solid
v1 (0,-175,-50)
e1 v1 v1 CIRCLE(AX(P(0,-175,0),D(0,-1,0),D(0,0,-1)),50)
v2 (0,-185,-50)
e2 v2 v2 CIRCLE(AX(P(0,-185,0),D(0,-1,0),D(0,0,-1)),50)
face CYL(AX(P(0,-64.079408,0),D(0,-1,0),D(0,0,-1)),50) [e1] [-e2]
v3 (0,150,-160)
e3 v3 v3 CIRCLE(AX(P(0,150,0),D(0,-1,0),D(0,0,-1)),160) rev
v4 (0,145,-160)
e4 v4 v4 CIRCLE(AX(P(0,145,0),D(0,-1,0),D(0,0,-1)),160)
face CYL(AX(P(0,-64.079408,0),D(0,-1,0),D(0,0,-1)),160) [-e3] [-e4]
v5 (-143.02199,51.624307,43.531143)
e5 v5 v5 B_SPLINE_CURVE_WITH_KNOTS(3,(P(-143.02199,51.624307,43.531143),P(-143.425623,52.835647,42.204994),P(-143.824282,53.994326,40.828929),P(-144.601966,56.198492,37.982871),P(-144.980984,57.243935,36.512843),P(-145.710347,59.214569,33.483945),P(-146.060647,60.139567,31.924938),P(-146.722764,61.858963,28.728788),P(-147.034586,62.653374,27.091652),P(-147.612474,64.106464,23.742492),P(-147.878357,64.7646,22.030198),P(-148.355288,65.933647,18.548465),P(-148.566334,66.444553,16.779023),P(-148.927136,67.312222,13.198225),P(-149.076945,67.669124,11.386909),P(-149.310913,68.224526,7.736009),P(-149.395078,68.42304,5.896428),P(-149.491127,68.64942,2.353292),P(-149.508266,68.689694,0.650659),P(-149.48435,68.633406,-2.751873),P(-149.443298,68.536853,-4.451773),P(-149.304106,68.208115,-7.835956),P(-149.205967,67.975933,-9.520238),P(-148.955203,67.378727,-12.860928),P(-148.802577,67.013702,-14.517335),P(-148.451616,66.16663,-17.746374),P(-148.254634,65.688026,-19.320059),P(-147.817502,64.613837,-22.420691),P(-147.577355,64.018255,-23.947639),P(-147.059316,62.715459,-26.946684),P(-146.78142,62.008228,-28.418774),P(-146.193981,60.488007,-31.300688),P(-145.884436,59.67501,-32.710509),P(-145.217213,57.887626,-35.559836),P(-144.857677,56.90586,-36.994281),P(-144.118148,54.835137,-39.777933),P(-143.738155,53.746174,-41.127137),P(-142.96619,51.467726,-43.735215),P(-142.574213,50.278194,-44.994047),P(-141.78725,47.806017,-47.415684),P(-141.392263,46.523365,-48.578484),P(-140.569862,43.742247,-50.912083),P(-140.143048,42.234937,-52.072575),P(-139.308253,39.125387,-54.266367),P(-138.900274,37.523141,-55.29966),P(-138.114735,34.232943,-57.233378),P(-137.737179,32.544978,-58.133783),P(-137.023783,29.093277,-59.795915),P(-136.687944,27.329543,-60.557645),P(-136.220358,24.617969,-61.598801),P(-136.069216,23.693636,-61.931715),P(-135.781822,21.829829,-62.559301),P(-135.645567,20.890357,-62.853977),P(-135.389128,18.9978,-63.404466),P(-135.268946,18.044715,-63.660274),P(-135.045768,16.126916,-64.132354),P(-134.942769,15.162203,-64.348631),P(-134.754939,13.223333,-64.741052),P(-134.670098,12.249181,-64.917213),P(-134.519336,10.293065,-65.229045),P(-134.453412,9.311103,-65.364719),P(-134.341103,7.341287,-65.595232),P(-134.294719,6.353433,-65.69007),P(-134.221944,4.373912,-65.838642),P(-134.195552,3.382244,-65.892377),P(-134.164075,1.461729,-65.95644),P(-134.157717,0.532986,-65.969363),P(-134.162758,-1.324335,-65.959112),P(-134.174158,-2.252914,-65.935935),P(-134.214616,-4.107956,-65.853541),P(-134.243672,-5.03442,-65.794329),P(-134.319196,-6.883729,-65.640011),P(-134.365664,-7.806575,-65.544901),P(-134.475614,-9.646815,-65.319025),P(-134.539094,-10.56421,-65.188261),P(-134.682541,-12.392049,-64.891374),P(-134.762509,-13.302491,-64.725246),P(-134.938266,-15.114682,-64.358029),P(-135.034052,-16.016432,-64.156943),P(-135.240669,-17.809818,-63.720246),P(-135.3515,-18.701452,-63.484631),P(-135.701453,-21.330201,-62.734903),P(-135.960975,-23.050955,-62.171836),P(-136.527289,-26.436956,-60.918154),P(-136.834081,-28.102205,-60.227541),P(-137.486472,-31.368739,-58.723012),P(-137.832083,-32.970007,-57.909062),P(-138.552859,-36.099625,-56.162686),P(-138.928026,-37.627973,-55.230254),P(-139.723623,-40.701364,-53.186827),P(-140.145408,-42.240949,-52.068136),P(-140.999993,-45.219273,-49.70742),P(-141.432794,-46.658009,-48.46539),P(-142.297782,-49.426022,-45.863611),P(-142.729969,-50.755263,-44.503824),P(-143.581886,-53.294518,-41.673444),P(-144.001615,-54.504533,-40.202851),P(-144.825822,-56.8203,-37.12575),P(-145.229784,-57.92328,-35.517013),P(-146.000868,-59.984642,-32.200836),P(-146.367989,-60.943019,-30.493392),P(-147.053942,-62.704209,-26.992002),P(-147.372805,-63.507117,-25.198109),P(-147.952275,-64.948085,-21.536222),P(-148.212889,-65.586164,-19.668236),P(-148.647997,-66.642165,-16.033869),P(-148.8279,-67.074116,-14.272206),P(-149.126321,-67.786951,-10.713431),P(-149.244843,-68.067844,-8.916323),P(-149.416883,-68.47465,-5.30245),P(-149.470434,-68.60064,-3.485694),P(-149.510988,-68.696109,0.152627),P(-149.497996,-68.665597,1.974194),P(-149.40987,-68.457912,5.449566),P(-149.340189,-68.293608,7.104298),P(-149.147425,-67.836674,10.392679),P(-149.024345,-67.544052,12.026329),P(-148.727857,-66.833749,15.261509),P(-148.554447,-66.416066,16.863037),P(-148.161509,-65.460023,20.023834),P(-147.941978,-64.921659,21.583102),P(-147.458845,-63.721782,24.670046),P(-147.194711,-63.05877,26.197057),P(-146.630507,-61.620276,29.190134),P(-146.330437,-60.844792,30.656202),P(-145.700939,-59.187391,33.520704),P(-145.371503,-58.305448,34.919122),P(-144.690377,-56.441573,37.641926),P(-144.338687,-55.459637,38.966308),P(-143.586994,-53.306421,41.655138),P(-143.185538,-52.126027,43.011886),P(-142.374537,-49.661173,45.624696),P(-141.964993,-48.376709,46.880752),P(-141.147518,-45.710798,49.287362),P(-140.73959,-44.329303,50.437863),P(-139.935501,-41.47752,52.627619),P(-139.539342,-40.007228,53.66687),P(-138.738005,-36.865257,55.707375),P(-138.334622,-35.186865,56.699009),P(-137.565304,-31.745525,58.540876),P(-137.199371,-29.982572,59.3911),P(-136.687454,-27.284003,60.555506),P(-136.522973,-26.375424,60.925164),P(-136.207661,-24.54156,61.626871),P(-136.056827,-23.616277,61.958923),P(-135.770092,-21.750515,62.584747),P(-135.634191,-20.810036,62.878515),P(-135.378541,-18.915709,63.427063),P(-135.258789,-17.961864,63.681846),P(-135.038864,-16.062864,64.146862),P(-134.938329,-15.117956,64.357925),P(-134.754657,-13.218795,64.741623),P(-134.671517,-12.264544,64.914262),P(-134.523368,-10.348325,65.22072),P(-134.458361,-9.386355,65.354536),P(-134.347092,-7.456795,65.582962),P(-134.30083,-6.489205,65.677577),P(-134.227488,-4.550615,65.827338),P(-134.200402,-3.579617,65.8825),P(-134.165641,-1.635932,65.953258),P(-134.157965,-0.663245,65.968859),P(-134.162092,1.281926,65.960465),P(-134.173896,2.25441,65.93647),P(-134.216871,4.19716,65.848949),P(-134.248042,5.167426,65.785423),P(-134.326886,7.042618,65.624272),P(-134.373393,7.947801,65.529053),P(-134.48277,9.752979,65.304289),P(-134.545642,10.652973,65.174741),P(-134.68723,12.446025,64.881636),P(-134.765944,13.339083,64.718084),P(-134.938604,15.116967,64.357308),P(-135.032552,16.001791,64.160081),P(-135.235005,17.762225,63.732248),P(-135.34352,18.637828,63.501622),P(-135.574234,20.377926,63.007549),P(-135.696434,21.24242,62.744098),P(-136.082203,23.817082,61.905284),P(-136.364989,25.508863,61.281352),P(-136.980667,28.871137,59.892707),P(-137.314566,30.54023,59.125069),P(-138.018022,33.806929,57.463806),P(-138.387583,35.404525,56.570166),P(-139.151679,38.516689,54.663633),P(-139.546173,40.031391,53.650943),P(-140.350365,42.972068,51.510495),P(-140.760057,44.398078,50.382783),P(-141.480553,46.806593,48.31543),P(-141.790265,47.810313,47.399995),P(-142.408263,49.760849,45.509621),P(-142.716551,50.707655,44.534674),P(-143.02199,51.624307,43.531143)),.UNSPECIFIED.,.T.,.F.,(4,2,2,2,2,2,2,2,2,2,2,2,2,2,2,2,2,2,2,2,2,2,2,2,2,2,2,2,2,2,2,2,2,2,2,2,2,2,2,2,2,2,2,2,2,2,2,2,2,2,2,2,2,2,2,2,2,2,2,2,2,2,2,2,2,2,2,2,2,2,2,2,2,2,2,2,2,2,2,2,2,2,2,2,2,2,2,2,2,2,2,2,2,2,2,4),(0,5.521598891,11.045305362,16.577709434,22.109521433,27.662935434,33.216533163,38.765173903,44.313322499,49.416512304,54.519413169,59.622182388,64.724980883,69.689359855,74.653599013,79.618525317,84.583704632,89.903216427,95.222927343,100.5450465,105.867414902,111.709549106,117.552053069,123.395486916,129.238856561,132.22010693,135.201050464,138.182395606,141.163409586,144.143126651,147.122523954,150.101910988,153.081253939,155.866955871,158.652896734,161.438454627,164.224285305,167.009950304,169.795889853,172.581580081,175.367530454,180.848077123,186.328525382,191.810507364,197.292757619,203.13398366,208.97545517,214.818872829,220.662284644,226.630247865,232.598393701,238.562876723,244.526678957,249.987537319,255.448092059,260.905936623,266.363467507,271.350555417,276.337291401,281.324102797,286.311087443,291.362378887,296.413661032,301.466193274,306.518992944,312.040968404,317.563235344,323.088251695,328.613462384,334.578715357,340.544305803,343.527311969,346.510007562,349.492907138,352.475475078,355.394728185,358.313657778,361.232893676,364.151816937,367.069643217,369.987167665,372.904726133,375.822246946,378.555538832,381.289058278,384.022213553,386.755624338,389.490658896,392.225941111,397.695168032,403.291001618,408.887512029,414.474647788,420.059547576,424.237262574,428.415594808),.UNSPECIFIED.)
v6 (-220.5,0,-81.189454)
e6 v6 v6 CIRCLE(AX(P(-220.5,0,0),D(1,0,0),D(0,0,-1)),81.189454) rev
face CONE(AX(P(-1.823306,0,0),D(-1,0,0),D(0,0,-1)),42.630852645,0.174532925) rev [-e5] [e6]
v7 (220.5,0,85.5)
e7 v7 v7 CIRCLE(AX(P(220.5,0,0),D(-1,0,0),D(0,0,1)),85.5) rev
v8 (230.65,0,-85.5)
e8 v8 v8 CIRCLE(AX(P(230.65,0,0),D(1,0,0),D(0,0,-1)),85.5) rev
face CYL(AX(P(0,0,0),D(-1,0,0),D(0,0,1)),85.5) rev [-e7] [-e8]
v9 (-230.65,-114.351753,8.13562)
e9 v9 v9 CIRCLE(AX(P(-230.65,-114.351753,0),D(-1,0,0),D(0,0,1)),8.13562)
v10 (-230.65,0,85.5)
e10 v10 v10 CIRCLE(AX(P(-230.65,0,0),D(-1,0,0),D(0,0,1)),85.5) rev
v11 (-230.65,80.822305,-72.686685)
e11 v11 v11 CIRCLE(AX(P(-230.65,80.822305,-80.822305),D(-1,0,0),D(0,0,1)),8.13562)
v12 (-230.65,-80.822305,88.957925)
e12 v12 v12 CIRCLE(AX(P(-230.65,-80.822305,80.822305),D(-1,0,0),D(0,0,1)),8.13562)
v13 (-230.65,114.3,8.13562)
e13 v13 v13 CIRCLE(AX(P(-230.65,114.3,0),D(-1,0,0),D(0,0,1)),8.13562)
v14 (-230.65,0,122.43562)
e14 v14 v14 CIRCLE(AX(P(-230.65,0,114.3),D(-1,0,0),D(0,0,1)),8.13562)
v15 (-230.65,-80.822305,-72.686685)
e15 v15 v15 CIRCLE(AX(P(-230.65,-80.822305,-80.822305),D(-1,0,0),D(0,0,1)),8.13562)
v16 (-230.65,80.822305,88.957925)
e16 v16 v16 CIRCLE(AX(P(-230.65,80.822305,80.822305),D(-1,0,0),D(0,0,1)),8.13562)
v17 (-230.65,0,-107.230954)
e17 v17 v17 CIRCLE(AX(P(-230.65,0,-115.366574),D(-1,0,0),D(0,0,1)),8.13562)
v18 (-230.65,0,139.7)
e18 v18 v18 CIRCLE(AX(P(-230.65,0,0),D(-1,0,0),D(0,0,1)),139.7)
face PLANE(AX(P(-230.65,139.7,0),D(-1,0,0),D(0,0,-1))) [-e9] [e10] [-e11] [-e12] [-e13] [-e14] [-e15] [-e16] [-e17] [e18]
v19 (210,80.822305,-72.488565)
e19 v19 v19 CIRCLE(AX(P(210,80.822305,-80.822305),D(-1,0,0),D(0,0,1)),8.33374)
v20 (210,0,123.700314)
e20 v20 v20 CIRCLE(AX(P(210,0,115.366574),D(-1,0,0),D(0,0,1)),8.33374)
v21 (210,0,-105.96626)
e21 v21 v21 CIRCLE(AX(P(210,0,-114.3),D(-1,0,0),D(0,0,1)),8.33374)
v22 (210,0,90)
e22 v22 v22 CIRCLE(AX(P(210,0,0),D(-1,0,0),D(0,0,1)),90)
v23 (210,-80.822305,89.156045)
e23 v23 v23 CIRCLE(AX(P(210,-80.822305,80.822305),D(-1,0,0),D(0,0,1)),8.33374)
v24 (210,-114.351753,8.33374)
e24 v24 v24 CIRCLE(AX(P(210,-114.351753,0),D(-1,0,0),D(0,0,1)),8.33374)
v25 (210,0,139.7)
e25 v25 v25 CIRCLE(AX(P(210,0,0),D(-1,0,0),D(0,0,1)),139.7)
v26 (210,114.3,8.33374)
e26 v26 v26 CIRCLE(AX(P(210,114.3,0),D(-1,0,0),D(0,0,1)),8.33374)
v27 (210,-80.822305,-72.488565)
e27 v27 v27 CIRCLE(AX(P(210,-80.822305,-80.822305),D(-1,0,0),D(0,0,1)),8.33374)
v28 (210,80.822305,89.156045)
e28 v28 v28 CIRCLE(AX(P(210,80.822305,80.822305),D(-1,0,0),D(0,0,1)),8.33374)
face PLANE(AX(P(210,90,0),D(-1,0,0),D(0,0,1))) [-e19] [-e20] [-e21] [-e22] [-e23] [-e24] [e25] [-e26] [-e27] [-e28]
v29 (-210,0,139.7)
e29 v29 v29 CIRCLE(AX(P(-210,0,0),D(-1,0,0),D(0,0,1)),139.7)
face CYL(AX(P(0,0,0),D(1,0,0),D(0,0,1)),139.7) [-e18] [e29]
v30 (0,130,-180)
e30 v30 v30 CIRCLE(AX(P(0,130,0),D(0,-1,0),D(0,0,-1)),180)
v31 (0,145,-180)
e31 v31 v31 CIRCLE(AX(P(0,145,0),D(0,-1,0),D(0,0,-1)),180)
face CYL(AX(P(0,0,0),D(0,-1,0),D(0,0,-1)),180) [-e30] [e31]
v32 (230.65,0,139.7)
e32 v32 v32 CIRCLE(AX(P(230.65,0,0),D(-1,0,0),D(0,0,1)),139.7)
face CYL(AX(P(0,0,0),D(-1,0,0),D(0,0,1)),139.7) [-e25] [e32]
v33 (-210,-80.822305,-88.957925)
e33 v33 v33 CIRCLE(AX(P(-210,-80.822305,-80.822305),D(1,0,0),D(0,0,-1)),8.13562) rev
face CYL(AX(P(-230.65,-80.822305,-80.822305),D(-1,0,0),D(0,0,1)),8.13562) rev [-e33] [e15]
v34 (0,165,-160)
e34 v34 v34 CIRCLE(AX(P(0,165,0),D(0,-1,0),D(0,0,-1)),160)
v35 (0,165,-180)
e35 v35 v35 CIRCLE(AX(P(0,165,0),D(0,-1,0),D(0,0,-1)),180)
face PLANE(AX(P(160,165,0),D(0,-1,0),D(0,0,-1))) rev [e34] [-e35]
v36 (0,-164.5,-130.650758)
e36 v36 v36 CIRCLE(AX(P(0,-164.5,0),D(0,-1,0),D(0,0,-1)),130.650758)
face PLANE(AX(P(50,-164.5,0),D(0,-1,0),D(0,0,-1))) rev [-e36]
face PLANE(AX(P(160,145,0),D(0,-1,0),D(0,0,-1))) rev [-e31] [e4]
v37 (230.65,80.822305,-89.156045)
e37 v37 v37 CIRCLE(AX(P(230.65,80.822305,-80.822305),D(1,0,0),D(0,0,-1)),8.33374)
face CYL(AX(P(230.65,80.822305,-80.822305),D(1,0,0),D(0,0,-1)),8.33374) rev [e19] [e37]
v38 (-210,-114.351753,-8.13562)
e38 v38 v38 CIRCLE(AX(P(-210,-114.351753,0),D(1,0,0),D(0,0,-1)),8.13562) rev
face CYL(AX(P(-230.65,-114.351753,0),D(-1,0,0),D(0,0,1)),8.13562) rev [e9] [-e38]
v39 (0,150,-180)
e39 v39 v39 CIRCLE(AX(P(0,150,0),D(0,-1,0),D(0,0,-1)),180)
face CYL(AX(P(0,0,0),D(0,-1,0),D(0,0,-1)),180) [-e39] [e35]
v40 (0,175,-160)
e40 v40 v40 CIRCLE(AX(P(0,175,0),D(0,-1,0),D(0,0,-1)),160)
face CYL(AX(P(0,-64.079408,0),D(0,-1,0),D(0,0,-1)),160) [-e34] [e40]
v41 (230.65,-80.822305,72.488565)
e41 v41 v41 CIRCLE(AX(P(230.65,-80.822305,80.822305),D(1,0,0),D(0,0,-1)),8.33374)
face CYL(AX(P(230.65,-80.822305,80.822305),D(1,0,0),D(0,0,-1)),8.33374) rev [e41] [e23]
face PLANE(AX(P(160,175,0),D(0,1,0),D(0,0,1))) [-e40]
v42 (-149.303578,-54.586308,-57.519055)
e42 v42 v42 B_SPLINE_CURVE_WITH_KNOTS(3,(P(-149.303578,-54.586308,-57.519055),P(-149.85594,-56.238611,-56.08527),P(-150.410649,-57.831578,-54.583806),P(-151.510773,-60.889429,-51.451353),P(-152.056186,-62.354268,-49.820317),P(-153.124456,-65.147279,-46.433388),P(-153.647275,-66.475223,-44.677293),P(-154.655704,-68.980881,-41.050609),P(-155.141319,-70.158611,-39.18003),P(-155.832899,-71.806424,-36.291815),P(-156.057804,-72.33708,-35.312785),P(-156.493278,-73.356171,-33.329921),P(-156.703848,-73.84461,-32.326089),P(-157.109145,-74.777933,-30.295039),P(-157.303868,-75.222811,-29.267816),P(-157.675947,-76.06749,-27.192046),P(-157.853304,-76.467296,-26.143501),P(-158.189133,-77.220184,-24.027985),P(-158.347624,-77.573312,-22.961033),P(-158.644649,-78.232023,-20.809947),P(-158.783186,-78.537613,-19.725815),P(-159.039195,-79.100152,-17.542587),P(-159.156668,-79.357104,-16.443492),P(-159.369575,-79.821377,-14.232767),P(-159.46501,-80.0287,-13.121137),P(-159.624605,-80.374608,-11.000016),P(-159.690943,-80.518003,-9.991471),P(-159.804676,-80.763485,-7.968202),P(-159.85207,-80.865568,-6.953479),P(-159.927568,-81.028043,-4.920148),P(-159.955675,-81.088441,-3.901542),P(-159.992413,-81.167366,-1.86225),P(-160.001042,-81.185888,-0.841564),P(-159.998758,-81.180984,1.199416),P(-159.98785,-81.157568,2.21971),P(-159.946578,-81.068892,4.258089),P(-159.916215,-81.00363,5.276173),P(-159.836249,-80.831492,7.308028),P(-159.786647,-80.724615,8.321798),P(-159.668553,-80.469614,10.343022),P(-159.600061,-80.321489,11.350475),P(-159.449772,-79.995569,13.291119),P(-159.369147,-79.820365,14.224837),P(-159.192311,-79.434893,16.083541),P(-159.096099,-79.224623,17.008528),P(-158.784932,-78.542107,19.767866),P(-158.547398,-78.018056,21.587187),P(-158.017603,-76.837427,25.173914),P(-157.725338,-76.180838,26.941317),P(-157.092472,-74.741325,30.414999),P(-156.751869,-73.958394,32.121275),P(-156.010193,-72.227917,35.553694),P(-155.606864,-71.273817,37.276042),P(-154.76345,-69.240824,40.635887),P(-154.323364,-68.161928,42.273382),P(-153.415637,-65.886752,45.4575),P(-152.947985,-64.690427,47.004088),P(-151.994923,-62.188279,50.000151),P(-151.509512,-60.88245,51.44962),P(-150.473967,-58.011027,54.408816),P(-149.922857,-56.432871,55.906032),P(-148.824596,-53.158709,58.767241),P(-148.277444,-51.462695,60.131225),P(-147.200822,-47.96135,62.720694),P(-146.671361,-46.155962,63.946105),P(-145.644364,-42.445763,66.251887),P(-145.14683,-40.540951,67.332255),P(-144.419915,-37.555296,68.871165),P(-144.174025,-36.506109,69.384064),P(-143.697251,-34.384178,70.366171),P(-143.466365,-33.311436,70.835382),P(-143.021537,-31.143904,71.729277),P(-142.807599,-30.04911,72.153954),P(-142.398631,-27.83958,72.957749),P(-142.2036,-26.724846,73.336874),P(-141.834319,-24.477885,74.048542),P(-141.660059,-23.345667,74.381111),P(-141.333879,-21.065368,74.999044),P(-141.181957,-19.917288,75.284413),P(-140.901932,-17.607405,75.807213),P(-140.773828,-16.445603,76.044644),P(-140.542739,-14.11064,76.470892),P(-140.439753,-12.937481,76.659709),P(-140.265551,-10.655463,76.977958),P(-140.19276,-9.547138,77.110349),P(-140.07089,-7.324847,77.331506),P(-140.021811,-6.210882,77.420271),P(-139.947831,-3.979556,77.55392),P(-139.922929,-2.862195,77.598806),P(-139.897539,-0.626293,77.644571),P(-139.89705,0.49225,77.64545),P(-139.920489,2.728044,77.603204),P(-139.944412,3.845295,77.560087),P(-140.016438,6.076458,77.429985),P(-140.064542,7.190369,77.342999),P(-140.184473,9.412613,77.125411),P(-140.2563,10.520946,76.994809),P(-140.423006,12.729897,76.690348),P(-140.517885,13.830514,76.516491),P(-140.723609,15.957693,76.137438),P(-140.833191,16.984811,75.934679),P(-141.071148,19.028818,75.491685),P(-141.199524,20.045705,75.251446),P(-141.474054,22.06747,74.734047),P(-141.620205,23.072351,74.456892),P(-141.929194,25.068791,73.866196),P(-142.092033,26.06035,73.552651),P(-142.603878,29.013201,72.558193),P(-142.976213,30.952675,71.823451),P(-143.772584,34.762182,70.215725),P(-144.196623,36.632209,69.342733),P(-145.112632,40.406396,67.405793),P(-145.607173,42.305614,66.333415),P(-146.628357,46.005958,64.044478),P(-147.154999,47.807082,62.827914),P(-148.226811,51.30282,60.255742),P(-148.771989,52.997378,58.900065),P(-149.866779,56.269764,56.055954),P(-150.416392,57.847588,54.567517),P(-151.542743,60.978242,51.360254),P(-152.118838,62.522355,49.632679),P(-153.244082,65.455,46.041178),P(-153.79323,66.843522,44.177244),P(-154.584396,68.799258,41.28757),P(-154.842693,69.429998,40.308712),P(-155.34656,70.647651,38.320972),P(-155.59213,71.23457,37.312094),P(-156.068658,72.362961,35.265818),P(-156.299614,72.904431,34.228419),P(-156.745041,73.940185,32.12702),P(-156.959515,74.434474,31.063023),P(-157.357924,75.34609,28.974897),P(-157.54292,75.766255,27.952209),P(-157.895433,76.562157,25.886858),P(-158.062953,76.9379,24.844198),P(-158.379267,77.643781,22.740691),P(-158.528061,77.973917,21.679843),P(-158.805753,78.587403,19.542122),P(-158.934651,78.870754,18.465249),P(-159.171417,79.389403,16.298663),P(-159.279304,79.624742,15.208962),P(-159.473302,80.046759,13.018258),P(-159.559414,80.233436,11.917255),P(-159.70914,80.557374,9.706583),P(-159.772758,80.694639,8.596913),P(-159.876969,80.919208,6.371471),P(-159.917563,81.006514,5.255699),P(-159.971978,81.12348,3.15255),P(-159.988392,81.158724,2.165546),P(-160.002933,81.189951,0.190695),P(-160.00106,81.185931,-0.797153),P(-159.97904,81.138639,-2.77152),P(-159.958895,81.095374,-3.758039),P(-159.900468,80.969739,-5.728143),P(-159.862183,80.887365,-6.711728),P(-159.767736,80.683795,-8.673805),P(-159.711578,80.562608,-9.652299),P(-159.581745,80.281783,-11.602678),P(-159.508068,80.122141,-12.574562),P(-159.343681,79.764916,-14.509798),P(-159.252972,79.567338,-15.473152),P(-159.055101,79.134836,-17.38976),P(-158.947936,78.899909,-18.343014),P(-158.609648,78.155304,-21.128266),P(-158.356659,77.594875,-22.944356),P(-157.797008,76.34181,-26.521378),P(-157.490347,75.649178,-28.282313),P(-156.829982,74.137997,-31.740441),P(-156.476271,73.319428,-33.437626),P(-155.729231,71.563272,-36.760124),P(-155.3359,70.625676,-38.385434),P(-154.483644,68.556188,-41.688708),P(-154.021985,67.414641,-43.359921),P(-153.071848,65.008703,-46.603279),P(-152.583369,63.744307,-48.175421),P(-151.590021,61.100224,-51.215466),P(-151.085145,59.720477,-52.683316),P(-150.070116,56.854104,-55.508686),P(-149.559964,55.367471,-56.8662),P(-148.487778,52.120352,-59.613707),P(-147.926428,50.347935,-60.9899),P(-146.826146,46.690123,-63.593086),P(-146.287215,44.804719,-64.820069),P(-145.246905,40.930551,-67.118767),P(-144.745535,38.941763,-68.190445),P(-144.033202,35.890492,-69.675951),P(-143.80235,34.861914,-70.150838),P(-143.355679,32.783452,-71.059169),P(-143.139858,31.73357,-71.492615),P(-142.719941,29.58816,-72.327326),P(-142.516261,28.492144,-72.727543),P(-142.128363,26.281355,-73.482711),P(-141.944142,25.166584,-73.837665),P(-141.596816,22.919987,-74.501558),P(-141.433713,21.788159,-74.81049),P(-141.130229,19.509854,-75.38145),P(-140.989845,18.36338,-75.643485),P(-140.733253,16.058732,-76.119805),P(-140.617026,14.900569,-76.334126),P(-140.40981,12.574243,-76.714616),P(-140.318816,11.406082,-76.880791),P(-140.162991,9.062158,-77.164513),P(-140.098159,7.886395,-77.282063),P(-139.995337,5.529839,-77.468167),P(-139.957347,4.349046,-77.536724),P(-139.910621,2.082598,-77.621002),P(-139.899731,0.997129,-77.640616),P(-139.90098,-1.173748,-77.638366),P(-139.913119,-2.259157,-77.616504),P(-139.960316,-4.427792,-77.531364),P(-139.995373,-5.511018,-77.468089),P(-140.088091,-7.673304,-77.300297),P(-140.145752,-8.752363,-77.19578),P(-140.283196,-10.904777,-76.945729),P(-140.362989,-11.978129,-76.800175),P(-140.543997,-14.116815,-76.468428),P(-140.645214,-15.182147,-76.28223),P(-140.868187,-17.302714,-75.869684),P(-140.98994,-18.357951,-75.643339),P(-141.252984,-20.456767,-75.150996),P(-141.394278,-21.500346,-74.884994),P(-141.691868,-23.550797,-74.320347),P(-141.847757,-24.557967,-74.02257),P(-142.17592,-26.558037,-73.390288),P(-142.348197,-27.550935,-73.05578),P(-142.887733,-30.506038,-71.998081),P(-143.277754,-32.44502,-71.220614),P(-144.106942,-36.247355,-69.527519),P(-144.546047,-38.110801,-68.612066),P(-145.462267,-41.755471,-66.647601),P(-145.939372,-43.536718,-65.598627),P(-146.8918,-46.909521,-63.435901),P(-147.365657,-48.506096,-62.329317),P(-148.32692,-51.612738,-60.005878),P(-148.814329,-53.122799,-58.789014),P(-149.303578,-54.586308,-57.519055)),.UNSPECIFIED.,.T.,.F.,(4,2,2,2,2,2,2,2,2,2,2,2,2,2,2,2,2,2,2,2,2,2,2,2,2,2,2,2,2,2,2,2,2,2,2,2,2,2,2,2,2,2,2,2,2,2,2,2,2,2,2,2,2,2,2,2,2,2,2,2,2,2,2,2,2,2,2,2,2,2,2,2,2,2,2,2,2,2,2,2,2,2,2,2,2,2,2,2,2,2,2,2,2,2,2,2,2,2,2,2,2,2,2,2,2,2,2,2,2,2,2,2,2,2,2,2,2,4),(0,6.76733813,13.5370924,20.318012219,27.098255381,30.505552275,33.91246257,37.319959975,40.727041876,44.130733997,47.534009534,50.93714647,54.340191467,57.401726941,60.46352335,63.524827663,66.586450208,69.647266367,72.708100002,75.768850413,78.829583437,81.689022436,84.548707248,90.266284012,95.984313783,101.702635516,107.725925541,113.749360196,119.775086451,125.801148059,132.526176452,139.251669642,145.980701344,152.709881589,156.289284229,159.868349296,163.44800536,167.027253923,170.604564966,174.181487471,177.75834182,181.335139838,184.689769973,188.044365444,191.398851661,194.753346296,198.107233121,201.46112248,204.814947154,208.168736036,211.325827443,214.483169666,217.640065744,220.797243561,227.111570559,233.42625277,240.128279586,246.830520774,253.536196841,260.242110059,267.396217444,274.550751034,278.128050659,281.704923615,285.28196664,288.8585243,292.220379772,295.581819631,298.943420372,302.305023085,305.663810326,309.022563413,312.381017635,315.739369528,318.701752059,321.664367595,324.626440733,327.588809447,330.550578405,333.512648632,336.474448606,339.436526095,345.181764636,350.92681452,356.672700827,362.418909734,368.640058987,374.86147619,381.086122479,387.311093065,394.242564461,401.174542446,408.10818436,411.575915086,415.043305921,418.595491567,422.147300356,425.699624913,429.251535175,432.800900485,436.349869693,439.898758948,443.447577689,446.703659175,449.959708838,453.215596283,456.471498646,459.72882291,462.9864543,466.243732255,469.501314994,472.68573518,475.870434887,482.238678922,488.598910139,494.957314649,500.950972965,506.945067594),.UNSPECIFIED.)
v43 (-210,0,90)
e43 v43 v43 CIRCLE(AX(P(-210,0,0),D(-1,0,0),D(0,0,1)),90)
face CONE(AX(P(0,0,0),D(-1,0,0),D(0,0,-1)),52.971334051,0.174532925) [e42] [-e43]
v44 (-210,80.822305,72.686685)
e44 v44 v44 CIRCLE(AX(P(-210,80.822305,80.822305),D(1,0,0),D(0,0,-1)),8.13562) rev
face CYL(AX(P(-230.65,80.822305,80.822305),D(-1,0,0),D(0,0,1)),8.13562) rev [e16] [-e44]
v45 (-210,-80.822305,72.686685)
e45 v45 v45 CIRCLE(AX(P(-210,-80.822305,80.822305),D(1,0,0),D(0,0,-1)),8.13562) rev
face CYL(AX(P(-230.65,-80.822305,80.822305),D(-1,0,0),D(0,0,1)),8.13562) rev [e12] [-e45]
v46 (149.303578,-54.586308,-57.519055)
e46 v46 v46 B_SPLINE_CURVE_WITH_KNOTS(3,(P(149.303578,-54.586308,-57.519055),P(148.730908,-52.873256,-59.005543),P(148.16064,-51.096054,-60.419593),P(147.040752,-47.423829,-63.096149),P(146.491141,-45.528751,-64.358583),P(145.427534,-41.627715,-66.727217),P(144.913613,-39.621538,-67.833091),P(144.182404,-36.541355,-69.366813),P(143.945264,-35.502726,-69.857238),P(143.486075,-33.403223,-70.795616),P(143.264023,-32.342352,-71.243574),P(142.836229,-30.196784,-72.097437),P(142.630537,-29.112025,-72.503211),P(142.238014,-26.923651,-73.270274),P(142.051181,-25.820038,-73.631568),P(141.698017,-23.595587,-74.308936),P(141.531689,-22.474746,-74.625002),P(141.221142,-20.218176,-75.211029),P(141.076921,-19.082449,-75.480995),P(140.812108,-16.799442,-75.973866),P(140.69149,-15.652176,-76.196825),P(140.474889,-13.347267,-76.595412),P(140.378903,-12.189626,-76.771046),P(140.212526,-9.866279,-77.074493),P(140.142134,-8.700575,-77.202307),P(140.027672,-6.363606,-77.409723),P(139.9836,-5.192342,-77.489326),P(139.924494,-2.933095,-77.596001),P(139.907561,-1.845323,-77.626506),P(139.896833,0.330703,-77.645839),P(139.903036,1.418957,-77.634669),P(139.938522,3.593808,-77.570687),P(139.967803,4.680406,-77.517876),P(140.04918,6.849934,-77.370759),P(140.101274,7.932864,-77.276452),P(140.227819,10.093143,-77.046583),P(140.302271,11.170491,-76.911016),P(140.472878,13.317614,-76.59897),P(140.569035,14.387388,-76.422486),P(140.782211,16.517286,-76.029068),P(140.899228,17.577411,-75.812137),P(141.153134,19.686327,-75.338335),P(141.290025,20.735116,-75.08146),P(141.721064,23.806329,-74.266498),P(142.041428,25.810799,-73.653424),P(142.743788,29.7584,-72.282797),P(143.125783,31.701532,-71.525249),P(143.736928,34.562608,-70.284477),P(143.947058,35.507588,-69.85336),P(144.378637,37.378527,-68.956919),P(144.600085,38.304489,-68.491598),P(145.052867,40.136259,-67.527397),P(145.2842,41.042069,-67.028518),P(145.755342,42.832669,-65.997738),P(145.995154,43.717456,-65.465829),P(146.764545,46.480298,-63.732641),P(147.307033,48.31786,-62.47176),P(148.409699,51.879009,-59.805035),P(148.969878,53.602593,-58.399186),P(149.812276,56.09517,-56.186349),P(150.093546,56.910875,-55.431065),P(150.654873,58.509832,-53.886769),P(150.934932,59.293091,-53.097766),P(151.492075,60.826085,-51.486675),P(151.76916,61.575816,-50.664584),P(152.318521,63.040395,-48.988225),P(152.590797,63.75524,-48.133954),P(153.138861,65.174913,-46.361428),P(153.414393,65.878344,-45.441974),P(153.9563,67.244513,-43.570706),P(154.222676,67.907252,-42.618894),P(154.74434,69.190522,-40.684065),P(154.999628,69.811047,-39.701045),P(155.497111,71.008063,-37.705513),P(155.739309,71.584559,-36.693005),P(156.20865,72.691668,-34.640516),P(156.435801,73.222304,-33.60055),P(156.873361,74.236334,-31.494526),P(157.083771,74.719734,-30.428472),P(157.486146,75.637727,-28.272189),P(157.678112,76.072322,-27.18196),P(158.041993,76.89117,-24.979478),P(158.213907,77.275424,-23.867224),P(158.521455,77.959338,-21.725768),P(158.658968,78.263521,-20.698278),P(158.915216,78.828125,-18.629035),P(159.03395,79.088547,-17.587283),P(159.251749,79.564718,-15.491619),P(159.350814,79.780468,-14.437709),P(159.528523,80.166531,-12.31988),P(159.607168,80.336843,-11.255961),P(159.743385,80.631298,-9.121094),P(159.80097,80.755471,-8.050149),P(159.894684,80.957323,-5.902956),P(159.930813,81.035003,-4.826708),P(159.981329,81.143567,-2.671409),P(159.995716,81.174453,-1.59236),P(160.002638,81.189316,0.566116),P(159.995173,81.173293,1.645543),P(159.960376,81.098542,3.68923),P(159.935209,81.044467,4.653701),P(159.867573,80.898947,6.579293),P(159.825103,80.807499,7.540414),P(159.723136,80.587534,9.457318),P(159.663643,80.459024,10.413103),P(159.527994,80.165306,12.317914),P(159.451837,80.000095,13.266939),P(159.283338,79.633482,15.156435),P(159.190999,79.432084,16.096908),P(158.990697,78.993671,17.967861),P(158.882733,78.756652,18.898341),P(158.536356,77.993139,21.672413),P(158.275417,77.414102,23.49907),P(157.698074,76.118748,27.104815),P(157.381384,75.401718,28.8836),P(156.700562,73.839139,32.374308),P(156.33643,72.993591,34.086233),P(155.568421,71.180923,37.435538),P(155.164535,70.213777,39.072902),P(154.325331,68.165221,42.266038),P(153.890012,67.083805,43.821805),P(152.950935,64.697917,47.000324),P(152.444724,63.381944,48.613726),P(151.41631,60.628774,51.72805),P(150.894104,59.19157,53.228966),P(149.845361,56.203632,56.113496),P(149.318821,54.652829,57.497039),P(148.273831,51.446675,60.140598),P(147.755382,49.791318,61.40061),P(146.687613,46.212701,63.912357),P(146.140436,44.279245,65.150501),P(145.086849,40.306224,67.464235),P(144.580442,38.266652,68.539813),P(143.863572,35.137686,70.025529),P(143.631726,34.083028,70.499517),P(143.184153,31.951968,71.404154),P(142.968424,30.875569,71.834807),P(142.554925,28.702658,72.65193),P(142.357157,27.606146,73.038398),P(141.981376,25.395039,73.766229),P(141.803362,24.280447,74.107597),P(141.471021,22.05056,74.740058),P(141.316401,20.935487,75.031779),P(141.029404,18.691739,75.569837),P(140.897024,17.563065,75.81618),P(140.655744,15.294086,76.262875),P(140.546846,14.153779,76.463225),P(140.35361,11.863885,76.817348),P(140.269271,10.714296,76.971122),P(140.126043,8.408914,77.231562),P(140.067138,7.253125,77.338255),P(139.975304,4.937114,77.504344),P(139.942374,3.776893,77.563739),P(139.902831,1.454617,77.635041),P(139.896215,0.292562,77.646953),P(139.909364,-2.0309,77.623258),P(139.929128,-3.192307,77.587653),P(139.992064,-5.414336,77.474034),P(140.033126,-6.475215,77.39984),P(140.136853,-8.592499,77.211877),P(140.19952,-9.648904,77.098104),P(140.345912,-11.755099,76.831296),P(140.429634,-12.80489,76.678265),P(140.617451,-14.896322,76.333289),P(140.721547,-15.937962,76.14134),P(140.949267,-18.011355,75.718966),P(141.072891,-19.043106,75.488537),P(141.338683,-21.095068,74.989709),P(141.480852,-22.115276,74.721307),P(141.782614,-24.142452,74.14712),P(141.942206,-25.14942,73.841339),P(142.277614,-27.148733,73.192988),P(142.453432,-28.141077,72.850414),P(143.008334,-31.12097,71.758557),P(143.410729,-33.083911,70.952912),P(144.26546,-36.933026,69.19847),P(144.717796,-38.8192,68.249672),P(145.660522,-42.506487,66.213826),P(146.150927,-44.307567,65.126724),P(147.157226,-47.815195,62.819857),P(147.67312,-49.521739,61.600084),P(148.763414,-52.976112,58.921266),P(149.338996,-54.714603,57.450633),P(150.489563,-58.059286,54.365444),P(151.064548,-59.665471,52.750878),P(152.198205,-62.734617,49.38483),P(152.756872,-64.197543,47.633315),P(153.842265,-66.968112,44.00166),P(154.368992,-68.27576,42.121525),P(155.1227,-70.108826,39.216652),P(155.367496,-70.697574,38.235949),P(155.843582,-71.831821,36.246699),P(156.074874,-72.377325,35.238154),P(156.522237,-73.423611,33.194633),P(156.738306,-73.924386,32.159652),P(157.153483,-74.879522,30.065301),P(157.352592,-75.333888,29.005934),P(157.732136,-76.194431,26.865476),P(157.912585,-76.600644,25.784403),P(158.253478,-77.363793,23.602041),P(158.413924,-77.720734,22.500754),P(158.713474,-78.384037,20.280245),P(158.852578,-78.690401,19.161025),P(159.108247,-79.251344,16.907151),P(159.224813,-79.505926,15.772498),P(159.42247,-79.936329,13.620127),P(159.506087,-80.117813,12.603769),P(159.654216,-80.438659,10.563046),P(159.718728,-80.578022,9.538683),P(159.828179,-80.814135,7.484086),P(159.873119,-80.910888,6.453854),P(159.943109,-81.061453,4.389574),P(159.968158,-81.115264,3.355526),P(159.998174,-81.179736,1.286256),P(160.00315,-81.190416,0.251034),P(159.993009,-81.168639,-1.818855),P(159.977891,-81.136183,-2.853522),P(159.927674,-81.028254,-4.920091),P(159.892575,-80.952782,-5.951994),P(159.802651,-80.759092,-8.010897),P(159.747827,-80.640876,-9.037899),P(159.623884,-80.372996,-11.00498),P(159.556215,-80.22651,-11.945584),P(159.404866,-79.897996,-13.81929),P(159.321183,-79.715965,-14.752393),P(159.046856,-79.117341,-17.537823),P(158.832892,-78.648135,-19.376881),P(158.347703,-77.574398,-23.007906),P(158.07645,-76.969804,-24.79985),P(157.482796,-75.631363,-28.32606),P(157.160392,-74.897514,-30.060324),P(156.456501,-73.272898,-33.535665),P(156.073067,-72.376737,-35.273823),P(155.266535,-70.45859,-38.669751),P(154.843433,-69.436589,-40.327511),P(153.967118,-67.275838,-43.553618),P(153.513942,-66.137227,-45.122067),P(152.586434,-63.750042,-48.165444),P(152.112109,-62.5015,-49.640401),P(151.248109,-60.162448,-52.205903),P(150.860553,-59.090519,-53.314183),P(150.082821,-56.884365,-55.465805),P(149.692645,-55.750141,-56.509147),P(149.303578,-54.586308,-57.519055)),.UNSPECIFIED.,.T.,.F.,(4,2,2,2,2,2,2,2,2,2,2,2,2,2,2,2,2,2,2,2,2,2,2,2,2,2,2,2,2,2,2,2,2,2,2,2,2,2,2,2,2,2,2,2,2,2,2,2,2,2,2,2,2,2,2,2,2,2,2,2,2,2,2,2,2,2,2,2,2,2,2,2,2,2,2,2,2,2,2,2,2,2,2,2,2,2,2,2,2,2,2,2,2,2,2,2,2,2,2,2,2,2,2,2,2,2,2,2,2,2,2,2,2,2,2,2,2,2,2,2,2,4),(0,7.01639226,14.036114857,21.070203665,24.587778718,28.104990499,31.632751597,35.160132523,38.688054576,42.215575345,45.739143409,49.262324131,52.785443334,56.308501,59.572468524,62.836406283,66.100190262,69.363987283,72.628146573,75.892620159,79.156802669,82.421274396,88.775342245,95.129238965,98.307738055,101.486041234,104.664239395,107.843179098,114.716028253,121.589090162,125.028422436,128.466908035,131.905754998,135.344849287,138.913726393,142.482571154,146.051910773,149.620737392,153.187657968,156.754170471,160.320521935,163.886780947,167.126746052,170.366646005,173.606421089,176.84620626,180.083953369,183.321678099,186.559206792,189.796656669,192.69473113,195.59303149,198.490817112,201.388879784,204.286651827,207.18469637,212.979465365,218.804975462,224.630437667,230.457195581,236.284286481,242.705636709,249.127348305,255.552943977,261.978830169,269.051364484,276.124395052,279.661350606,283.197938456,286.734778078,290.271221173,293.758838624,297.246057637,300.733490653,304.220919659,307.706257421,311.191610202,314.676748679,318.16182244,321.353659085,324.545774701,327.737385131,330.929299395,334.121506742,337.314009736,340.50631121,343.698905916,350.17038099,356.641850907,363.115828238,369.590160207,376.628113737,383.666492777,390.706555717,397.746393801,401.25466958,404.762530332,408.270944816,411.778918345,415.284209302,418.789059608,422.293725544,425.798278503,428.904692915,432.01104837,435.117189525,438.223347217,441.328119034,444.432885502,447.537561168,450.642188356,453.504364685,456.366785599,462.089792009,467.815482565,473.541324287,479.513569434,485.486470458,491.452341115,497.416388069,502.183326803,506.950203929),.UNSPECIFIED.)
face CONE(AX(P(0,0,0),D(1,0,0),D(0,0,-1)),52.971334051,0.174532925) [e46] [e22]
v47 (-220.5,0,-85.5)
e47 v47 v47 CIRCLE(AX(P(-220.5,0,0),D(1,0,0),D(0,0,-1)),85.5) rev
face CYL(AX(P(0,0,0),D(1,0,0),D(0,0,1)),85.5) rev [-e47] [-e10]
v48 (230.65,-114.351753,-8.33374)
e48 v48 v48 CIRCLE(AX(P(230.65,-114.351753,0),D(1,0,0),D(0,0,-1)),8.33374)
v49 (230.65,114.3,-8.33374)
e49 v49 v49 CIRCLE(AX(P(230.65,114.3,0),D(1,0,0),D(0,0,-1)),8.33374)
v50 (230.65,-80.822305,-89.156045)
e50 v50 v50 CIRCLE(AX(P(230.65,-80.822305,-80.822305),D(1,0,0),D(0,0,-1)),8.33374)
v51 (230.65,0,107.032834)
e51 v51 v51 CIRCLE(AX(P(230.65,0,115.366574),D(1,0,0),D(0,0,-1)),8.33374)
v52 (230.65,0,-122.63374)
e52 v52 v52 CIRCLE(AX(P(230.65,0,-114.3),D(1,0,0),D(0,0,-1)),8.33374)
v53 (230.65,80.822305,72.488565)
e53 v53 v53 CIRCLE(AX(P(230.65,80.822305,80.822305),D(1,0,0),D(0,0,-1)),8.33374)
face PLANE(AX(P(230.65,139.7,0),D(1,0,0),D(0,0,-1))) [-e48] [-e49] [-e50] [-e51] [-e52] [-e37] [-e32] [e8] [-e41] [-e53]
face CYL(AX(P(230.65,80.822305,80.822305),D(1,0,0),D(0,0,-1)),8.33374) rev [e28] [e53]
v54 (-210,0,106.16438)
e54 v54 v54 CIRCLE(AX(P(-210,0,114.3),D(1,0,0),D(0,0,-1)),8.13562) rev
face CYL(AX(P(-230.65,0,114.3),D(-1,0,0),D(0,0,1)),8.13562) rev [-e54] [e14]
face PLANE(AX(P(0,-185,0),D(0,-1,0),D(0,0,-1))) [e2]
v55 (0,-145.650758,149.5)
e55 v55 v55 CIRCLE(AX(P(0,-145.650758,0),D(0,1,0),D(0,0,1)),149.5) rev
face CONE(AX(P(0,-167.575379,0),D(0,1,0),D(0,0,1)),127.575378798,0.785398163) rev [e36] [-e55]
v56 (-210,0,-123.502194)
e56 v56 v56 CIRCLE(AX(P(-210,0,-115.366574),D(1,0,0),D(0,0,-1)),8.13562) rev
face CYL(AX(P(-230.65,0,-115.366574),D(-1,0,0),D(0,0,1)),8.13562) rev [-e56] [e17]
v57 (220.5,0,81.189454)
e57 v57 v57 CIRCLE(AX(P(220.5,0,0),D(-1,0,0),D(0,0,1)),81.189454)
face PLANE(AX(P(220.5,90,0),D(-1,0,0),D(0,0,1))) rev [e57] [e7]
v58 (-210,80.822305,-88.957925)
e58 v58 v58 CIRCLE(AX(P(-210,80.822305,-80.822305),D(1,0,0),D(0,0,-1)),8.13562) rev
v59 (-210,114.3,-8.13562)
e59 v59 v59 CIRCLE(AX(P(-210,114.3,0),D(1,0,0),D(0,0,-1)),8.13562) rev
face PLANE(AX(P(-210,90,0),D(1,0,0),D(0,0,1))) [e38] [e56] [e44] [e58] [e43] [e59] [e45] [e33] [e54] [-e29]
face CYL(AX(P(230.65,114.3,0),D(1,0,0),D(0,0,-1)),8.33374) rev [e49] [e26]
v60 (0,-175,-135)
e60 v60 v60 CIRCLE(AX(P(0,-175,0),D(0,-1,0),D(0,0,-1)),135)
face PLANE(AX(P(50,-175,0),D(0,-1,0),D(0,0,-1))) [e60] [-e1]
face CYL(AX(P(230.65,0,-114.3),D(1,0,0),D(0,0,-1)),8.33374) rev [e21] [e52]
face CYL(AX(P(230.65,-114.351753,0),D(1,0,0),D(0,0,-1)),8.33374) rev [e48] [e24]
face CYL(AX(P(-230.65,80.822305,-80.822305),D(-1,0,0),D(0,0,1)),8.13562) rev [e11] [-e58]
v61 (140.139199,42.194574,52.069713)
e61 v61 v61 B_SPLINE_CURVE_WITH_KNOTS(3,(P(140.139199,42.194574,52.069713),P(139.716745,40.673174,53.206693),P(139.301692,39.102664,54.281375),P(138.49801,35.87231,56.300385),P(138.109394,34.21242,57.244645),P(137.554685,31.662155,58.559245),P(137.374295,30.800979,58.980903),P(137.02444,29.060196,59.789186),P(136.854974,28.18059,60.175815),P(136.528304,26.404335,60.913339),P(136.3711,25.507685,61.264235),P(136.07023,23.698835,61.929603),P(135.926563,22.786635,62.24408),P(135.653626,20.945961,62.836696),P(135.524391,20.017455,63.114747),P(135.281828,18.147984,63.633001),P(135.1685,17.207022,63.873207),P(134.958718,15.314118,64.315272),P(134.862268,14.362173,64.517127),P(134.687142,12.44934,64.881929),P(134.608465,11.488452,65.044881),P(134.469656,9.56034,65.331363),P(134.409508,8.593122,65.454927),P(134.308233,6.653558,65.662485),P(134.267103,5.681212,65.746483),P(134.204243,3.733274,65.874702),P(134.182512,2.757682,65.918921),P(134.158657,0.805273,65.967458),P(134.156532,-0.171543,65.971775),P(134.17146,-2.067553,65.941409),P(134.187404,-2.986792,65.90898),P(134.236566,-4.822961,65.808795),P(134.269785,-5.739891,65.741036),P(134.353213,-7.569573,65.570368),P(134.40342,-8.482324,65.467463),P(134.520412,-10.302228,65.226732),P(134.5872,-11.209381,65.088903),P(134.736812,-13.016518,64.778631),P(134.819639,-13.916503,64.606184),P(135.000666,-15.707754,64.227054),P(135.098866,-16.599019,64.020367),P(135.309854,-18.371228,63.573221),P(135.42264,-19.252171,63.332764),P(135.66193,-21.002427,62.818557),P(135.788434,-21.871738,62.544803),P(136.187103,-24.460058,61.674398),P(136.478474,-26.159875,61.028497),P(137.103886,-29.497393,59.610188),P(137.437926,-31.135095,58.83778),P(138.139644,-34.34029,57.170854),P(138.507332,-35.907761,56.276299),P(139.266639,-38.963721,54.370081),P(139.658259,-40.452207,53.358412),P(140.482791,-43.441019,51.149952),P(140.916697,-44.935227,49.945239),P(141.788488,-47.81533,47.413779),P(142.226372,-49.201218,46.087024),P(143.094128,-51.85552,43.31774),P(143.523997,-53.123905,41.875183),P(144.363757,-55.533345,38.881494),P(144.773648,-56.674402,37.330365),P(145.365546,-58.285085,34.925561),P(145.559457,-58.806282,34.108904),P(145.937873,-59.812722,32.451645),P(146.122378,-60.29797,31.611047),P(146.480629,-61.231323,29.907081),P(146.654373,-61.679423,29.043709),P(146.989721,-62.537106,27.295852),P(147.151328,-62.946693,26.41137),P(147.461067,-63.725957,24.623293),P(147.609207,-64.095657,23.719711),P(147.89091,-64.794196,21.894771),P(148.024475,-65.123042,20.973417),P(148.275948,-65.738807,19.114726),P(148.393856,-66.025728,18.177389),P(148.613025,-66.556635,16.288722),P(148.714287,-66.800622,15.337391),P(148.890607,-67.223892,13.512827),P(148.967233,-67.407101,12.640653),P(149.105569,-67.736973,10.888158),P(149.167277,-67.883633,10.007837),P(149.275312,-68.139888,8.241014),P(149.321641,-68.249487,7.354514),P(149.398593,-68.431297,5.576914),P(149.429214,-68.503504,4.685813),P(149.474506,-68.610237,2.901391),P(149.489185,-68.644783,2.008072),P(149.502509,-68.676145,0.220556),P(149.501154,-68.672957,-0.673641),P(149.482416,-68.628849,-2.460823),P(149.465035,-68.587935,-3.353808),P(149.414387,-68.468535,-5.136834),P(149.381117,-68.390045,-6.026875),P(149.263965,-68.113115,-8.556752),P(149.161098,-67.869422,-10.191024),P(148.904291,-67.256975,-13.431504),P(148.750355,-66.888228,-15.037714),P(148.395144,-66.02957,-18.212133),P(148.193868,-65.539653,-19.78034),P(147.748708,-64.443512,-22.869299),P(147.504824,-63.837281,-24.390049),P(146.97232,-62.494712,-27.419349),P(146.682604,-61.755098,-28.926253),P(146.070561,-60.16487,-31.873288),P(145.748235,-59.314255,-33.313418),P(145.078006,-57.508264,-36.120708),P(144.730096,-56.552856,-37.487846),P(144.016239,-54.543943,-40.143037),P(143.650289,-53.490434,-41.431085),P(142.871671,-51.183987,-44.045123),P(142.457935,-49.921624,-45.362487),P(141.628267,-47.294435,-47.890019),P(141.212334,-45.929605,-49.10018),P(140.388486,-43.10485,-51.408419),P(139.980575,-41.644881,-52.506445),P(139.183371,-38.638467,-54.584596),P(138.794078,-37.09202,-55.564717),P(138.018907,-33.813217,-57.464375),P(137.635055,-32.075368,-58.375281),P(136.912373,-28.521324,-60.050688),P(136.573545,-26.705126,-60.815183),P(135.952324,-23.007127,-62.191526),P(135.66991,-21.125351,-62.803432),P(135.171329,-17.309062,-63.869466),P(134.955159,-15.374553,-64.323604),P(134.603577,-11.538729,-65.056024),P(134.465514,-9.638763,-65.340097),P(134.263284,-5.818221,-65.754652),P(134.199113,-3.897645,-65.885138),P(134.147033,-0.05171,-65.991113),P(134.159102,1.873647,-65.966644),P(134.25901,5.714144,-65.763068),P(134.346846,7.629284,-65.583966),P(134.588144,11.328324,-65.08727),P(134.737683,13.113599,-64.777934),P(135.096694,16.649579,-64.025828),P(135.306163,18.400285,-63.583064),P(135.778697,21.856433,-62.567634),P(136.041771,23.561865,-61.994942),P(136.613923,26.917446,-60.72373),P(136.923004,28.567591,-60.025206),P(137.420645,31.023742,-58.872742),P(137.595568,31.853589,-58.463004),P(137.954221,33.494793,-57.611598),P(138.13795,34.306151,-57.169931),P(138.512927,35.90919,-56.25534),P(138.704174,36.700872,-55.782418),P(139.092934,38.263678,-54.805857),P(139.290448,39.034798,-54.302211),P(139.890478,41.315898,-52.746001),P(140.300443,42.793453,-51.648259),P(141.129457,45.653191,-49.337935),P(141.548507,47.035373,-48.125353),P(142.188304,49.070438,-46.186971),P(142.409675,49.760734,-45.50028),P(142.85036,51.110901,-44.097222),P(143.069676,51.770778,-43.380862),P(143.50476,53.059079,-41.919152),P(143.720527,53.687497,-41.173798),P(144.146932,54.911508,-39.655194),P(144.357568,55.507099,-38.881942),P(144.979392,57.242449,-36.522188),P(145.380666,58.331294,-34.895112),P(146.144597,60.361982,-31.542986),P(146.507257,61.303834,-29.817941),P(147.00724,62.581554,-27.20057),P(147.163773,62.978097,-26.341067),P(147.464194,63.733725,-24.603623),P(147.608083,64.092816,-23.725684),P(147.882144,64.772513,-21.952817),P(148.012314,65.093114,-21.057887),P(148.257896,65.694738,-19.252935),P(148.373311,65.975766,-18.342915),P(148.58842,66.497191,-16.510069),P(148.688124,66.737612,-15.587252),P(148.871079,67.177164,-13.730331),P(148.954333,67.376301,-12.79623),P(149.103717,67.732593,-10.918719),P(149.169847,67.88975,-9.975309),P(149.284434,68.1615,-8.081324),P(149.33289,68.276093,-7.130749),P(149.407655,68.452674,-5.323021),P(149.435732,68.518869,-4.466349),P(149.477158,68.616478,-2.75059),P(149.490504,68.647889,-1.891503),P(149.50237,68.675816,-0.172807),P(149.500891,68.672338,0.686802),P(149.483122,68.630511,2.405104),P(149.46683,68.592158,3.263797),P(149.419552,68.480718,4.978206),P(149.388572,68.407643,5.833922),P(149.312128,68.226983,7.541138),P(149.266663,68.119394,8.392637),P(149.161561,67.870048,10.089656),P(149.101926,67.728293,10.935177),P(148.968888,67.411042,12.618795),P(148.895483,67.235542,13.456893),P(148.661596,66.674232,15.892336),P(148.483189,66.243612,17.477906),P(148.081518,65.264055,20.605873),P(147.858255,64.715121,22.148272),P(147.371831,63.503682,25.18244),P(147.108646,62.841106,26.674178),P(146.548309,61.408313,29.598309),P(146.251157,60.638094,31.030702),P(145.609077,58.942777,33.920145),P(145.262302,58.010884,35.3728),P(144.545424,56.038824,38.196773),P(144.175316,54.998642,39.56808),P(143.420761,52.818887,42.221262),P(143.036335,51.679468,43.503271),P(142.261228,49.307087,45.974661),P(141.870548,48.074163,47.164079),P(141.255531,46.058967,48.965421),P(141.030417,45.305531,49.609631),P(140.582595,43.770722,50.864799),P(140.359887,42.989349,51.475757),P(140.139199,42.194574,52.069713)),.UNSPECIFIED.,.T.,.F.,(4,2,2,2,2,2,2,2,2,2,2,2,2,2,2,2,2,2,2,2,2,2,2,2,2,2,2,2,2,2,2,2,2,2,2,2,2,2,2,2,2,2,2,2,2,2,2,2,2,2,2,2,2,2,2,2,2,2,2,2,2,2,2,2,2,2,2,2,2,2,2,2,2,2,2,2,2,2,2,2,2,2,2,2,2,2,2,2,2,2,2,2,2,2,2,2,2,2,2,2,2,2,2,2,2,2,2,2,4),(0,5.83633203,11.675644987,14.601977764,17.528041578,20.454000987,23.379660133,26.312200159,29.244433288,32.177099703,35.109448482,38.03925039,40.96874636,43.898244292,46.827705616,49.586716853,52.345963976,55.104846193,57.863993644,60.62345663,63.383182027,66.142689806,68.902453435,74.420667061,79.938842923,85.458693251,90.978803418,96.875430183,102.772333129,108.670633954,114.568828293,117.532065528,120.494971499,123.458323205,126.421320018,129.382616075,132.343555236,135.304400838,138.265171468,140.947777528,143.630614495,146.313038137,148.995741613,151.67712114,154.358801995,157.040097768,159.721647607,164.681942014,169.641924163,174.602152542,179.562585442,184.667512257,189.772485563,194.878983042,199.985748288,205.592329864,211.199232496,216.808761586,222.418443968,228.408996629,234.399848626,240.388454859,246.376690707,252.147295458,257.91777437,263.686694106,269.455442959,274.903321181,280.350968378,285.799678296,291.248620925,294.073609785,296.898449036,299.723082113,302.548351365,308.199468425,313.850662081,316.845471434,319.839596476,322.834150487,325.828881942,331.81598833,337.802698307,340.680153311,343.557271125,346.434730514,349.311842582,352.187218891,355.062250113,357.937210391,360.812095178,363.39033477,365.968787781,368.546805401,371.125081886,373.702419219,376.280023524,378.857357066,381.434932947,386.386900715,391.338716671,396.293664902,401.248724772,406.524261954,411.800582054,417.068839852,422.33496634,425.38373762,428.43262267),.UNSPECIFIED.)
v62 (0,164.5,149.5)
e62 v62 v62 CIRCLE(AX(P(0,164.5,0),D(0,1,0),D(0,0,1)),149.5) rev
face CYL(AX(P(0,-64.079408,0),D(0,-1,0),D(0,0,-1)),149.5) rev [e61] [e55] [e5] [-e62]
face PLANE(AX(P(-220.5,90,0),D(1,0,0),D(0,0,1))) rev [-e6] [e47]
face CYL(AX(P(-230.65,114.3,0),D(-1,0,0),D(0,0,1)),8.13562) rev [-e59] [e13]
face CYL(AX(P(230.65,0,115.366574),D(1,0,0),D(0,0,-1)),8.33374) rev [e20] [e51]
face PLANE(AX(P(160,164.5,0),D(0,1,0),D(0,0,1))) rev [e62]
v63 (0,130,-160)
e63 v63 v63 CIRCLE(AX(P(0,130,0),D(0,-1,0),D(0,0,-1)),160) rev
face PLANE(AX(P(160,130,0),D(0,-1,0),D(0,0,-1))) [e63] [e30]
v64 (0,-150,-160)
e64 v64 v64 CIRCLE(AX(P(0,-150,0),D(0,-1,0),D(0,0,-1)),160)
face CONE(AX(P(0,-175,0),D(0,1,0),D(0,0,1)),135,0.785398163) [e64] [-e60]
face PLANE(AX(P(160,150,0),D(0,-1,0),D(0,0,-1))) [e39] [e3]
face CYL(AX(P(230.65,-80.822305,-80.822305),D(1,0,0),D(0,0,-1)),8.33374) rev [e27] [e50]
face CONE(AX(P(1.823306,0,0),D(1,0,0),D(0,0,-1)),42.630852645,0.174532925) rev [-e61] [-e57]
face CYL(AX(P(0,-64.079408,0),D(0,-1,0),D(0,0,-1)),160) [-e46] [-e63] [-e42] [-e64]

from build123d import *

# Parameters (mm, degrees)
SKETCH2_W                   = 20
SKETCH2_H                   = 15
SHELL1_START                = -39.5000001
SHELL1_OUTLINE_R            = 85.5
SHELL1_DEPTH                = 79.0000001
SHELL1_START_2              = -235.4
SHELL1_2_OUTLINE_R          = 85.5
SHELL1_2_DEPTH              = 14.9
SHELL1_START_3              = 220.5
SHELL1_3_OUTLINE_R          = 85.5
SHELL1_3_DEPTH              = 14.9
SHELL1_START_4              = -145.650757695
SHELL1_4_OUTLINE_R          = 149.5
SHELL1_4_DEPTH              = 310.150757695
SHELL1_START_5              = -174.5
SHELL1_5_OUTLINE_R          = 39.5
SHELL1_5_DEPTH              = 89
SKETCH15_R                  = 96
CUT_EXTRUDE4_DEPTH          = 4.75
SKETCH14_R                  = 39.5
EXTRUDE2_DEPTH              = 10
F_5_8_CLEARANCE_HOLE5_D     = 16.27124
F_5_8_CLEARANCE_HOLE5_DEPTH = 20.65
F_5_8_CLEARANCE_HOLE6_D     = 16.66748
F_5_8_CLEARANCE_HOLE6_DEPTH = 20.65
SKETCH30_R                  = 96
CUT_EXTRUDE5_DEPTH          = 529.604474064


with BuildPart() as part:
    # Sketch1 → Base-Revolve (revolve)
    with BuildSketch(Plane.XY, mode=Mode.PRIVATE) as base_revolve_sk:
        Polygon((0, -185), (50, -185), (50, -175), (135, -175), (160, -150), (160, 175), (0, 175), align=None)
    revolve(base_revolve_sk.sketch.rotate(Axis((0, -64.079408138, 0), (0, 1, 0)), 90), axis=Axis((0, -64.079408138, 0), (0, 1, 0)))

    # Sketch2 → Boss-Revolve1 (revolve)
    with BuildSketch(Plane.XY, mode=Mode.PRIVATE) as boss_revolve1_sk:
        with Locations((170, 157.5)):
            Rectangle(SKETCH2_W, SKETCH2_H)
        with Locations((170, 137.5)):
            Rectangle(SKETCH2_W, SKETCH2_H)
    revolve(boss_revolve1_sk.sketch.rotate(Axis((0, 0, 0), (0, 1, 0)), 90), axis=Axis((0, 0, 0), (0, 1, 0)))

    # Sketch3 → Boss-Revolve2 (revolve)
    with BuildSketch(Plane.XY, mode=Mode.PRIVATE) as boss_revolve2_sk:
        Polygon((0, 0), (0, 52.971334051), (210, 90), (210, 139.7), (230.65, 139.7), (230.65, 96), (235.4, 96), (235.4, 0), align=None)
    boss_revolve2 = revolve(boss_revolve2_sk.sketch.rotate(Axis((0, 0, 0), (1, 0, 0)), 90), axis=Axis((0, 0, 0), (1, 0, 0)))

    # Mirror1: Boss-Revolve2 across plane
    add(boss_revolve2.mirror(Plane(origin=(0, 0, 0), x_dir=(0, 0, 1), z_dir=(1, 0, 0))))

    # Shell1: read off the stored shape, not the designer's step
    # Shell1 outline → Shell1 (cut)
    with BuildSketch(Plane.YZ.offset(SHELL1_START)):
        Circle(SHELL1_OUTLINE_R)
    extrude(amount=SHELL1_DEPTH, mode=Mode.SUBTRACT)

    # Shell1 2 outline → Shell1 2 (cut)
    with BuildSketch(Plane.YZ.offset(SHELL1_START_2)):
        Circle(SHELL1_2_OUTLINE_R)
    extrude(amount=SHELL1_2_DEPTH, mode=Mode.SUBTRACT)

    # Shell1 3 outline → Shell1 3 (cut)
    with BuildSketch(Plane.YZ.offset(SHELL1_START_3)):
        Circle(SHELL1_3_OUTLINE_R)
    extrude(amount=SHELL1_3_DEPTH, mode=Mode.SUBTRACT)

    # Shell1 4 outline → Shell1 4 (cut)
    with BuildSketch(Plane(origin=(0, 0, 0), x_dir=(1, 0, 0), z_dir=(0, 1, 0)).offset(SHELL1_START_4)):
        Circle(SHELL1_4_OUTLINE_R)
    extrude(amount=SHELL1_4_DEPTH, mode=Mode.SUBTRACT)

    # Shell1 5 outline → Shell1 5 (cut)
    with BuildSketch(Plane(origin=(0, 0, 0), x_dir=(1, 0, 0), z_dir=(0, 1, 0)).offset(SHELL1_START_5)):
        Circle(SHELL1_5_OUTLINE_R)
    extrude(amount=SHELL1_5_DEPTH, mode=Mode.SUBTRACT)

    # Shell1 6: loft between two sections, ruled curve by curve
    shell1_6_from = [
        Edge.make_three_point_arc((0, -164.5, 130.650757595), (130.650757595, -164.5, 0), (0, -164.5, -130.650757595)),
        Edge.make_three_point_arc((0, -164.5, -130.650757595), (-130.650757595, -164.5, 0), (0, -164.5, 130.650757595)),
    ]
    shell1_6_to = [
        Edge.make_three_point_arc((0, -145.650757595, 149.5), (149.5, -145.650757595, 0), (0, -145.650757595, -149.5)),
        Edge.make_three_point_arc((0, -145.650757595, -149.5), (-149.5, -145.650757595, 0), (0, -145.650757595, 149.5)),
    ]
    shell1_6 = Solid(Shell([*[Face.make_surface_from_curves(shell1_6_from[k], shell1_6_to[k]) for k in range(2)], Face(Wire(shell1_6_from)), Face(Wire(shell1_6_to))]))
    add(shell1_6, mode=Mode.SUBTRACT)

    # Shell1 7: loft between two sections, ruled curve by curve
    shell1_7_from = [
        Edge.make_three_point_arc((134.158642782, 41.530655606, 51.250412113), (134.158642782, -51.250412113, 41.530655606), (134.158642782, -41.530655606, -51.250412113)),
        Edge.make_three_point_arc((134.158642782, -41.530655606, -51.250412113), (134.158642782, 51.250412113, -41.530655606), (134.158642782, 41.530655606, 51.250412113)),
    ]
    shell1_7_to = [
        Edge.make_three_point_arc((220.5, 51.115651267, 63.078662127), (220.5, -63.078662127, 51.115651267), (220.5, -51.115651267, -63.078662127)),
        Edge.make_three_point_arc((220.5, -51.115651267, -63.078662127), (220.5, 63.078662127, -51.115651267), (220.5, 51.115651267, 63.078662127)),
    ]
    shell1_7 = Solid(Shell([*[Face.make_surface_from_curves(shell1_7_from[k], shell1_7_to[k]) for k in range(2)], Face(Wire(shell1_7_from)), Face(Wire(shell1_7_to))]))
    add(shell1_7, mode=Mode.SUBTRACT)

    # Shell1 8: loft between two sections, ruled curve by curve
    shell1_8_from = [
        Edge.make_three_point_arc((-134.158707207, 0, -65.965154404), (-134.158707207, -65.965154404, 0), (-134.158707207, 0, 65.965154404)),
        Edge.make_three_point_arc((-134.158707207, 0, 65.965154404), (-134.158707207, 65.965154404, 0), (-134.158707207, 0, -65.965154404)),
    ]
    shell1_8_to = [
        Edge.make_three_point_arc((-220.5, 0, -81.189453873), (-220.5, -81.189453873, 0), (-220.5, 0, 81.189453873)),
        Edge.make_three_point_arc((-220.5, 0, 81.189453873), (-220.5, 81.189453873, 0), (-220.5, 0, -81.189453873)),
    ]
    shell1_8 = Solid(Shell([*[Face.make_surface_from_curves(shell1_8_from[k], shell1_8_to[k]) for k in range(2)], Face(Wire(shell1_8_from)), Face(Wire(shell1_8_to))]))
    add(shell1_8, mode=Mode.SUBTRACT)

    # Sketch15 → Cut-Extrude4 (cut)
    with BuildSketch(Plane.ZY.offset(230.65)):
        Circle(SKETCH15_R)
    extrude(amount=CUT_EXTRUDE4_DEPTH, mode=Mode.SUBTRACT)

    # Sketch14 → Extrude2 (add)
    with BuildSketch(Plane(origin=(0, -174.5, 0), x_dir=(1, 0, 0), z_dir=(0, 1, 0))):
        Circle(SKETCH14_R)
    extrude(amount=EXTRUDE2_DEPTH)

    # 5/8 Clearance Hole5
    with Locations(Plane(origin=(-230.65, -86.94526051, 61.229912904), x_dir=(0, 0, 1), z_dir=(-1, 0, 0))):
        with Locations((-61.229912904, 201.24526051), (-176.596487394, 86.94526051), (-142.052217993, 167.767565599), (19.592392186, 167.767565599), (53.070087096, 86.94526051), (19.592392186, 6.12295542), (-61.229912904, -27.406492985), (-142.052217993, 6.12295542)):
            Hole(F_5_8_CLEARANCE_HOLE5_D / 2, depth=F_5_8_CLEARANCE_HOLE5_DEPTH)

    # 5/8 Clearance Hole6
    with Locations(Plane(origin=(230.65, 0, 0), x_dir=(0, 0, -1), z_dir=(1, 0, 0))):
        with Locations((-80.82230509, 80.82230509), (0, 114.3), (80.82230509, 80.82230509), (114.3, 0), (80.82230509, -80.82230509), (0, -114.351753494), (-80.82230509, -80.82230509), (-115.366574491, 0)):
            Hole(F_5_8_CLEARANCE_HOLE6_D / 2, depth=F_5_8_CLEARANCE_HOLE6_DEPTH)

    # Sketch30 → Cut-Extrude5 (cut, through all)
    with BuildSketch(Plane(origin=(230.65, 0, 0), x_dir=(0, 0, -1), z_dir=(1, 0, 0))):
        Circle(SKETCH30_R)
    extrude(amount=CUT_EXTRUDE5_DEPTH, mode=Mode.SUBTRACT)


solid = part.part
